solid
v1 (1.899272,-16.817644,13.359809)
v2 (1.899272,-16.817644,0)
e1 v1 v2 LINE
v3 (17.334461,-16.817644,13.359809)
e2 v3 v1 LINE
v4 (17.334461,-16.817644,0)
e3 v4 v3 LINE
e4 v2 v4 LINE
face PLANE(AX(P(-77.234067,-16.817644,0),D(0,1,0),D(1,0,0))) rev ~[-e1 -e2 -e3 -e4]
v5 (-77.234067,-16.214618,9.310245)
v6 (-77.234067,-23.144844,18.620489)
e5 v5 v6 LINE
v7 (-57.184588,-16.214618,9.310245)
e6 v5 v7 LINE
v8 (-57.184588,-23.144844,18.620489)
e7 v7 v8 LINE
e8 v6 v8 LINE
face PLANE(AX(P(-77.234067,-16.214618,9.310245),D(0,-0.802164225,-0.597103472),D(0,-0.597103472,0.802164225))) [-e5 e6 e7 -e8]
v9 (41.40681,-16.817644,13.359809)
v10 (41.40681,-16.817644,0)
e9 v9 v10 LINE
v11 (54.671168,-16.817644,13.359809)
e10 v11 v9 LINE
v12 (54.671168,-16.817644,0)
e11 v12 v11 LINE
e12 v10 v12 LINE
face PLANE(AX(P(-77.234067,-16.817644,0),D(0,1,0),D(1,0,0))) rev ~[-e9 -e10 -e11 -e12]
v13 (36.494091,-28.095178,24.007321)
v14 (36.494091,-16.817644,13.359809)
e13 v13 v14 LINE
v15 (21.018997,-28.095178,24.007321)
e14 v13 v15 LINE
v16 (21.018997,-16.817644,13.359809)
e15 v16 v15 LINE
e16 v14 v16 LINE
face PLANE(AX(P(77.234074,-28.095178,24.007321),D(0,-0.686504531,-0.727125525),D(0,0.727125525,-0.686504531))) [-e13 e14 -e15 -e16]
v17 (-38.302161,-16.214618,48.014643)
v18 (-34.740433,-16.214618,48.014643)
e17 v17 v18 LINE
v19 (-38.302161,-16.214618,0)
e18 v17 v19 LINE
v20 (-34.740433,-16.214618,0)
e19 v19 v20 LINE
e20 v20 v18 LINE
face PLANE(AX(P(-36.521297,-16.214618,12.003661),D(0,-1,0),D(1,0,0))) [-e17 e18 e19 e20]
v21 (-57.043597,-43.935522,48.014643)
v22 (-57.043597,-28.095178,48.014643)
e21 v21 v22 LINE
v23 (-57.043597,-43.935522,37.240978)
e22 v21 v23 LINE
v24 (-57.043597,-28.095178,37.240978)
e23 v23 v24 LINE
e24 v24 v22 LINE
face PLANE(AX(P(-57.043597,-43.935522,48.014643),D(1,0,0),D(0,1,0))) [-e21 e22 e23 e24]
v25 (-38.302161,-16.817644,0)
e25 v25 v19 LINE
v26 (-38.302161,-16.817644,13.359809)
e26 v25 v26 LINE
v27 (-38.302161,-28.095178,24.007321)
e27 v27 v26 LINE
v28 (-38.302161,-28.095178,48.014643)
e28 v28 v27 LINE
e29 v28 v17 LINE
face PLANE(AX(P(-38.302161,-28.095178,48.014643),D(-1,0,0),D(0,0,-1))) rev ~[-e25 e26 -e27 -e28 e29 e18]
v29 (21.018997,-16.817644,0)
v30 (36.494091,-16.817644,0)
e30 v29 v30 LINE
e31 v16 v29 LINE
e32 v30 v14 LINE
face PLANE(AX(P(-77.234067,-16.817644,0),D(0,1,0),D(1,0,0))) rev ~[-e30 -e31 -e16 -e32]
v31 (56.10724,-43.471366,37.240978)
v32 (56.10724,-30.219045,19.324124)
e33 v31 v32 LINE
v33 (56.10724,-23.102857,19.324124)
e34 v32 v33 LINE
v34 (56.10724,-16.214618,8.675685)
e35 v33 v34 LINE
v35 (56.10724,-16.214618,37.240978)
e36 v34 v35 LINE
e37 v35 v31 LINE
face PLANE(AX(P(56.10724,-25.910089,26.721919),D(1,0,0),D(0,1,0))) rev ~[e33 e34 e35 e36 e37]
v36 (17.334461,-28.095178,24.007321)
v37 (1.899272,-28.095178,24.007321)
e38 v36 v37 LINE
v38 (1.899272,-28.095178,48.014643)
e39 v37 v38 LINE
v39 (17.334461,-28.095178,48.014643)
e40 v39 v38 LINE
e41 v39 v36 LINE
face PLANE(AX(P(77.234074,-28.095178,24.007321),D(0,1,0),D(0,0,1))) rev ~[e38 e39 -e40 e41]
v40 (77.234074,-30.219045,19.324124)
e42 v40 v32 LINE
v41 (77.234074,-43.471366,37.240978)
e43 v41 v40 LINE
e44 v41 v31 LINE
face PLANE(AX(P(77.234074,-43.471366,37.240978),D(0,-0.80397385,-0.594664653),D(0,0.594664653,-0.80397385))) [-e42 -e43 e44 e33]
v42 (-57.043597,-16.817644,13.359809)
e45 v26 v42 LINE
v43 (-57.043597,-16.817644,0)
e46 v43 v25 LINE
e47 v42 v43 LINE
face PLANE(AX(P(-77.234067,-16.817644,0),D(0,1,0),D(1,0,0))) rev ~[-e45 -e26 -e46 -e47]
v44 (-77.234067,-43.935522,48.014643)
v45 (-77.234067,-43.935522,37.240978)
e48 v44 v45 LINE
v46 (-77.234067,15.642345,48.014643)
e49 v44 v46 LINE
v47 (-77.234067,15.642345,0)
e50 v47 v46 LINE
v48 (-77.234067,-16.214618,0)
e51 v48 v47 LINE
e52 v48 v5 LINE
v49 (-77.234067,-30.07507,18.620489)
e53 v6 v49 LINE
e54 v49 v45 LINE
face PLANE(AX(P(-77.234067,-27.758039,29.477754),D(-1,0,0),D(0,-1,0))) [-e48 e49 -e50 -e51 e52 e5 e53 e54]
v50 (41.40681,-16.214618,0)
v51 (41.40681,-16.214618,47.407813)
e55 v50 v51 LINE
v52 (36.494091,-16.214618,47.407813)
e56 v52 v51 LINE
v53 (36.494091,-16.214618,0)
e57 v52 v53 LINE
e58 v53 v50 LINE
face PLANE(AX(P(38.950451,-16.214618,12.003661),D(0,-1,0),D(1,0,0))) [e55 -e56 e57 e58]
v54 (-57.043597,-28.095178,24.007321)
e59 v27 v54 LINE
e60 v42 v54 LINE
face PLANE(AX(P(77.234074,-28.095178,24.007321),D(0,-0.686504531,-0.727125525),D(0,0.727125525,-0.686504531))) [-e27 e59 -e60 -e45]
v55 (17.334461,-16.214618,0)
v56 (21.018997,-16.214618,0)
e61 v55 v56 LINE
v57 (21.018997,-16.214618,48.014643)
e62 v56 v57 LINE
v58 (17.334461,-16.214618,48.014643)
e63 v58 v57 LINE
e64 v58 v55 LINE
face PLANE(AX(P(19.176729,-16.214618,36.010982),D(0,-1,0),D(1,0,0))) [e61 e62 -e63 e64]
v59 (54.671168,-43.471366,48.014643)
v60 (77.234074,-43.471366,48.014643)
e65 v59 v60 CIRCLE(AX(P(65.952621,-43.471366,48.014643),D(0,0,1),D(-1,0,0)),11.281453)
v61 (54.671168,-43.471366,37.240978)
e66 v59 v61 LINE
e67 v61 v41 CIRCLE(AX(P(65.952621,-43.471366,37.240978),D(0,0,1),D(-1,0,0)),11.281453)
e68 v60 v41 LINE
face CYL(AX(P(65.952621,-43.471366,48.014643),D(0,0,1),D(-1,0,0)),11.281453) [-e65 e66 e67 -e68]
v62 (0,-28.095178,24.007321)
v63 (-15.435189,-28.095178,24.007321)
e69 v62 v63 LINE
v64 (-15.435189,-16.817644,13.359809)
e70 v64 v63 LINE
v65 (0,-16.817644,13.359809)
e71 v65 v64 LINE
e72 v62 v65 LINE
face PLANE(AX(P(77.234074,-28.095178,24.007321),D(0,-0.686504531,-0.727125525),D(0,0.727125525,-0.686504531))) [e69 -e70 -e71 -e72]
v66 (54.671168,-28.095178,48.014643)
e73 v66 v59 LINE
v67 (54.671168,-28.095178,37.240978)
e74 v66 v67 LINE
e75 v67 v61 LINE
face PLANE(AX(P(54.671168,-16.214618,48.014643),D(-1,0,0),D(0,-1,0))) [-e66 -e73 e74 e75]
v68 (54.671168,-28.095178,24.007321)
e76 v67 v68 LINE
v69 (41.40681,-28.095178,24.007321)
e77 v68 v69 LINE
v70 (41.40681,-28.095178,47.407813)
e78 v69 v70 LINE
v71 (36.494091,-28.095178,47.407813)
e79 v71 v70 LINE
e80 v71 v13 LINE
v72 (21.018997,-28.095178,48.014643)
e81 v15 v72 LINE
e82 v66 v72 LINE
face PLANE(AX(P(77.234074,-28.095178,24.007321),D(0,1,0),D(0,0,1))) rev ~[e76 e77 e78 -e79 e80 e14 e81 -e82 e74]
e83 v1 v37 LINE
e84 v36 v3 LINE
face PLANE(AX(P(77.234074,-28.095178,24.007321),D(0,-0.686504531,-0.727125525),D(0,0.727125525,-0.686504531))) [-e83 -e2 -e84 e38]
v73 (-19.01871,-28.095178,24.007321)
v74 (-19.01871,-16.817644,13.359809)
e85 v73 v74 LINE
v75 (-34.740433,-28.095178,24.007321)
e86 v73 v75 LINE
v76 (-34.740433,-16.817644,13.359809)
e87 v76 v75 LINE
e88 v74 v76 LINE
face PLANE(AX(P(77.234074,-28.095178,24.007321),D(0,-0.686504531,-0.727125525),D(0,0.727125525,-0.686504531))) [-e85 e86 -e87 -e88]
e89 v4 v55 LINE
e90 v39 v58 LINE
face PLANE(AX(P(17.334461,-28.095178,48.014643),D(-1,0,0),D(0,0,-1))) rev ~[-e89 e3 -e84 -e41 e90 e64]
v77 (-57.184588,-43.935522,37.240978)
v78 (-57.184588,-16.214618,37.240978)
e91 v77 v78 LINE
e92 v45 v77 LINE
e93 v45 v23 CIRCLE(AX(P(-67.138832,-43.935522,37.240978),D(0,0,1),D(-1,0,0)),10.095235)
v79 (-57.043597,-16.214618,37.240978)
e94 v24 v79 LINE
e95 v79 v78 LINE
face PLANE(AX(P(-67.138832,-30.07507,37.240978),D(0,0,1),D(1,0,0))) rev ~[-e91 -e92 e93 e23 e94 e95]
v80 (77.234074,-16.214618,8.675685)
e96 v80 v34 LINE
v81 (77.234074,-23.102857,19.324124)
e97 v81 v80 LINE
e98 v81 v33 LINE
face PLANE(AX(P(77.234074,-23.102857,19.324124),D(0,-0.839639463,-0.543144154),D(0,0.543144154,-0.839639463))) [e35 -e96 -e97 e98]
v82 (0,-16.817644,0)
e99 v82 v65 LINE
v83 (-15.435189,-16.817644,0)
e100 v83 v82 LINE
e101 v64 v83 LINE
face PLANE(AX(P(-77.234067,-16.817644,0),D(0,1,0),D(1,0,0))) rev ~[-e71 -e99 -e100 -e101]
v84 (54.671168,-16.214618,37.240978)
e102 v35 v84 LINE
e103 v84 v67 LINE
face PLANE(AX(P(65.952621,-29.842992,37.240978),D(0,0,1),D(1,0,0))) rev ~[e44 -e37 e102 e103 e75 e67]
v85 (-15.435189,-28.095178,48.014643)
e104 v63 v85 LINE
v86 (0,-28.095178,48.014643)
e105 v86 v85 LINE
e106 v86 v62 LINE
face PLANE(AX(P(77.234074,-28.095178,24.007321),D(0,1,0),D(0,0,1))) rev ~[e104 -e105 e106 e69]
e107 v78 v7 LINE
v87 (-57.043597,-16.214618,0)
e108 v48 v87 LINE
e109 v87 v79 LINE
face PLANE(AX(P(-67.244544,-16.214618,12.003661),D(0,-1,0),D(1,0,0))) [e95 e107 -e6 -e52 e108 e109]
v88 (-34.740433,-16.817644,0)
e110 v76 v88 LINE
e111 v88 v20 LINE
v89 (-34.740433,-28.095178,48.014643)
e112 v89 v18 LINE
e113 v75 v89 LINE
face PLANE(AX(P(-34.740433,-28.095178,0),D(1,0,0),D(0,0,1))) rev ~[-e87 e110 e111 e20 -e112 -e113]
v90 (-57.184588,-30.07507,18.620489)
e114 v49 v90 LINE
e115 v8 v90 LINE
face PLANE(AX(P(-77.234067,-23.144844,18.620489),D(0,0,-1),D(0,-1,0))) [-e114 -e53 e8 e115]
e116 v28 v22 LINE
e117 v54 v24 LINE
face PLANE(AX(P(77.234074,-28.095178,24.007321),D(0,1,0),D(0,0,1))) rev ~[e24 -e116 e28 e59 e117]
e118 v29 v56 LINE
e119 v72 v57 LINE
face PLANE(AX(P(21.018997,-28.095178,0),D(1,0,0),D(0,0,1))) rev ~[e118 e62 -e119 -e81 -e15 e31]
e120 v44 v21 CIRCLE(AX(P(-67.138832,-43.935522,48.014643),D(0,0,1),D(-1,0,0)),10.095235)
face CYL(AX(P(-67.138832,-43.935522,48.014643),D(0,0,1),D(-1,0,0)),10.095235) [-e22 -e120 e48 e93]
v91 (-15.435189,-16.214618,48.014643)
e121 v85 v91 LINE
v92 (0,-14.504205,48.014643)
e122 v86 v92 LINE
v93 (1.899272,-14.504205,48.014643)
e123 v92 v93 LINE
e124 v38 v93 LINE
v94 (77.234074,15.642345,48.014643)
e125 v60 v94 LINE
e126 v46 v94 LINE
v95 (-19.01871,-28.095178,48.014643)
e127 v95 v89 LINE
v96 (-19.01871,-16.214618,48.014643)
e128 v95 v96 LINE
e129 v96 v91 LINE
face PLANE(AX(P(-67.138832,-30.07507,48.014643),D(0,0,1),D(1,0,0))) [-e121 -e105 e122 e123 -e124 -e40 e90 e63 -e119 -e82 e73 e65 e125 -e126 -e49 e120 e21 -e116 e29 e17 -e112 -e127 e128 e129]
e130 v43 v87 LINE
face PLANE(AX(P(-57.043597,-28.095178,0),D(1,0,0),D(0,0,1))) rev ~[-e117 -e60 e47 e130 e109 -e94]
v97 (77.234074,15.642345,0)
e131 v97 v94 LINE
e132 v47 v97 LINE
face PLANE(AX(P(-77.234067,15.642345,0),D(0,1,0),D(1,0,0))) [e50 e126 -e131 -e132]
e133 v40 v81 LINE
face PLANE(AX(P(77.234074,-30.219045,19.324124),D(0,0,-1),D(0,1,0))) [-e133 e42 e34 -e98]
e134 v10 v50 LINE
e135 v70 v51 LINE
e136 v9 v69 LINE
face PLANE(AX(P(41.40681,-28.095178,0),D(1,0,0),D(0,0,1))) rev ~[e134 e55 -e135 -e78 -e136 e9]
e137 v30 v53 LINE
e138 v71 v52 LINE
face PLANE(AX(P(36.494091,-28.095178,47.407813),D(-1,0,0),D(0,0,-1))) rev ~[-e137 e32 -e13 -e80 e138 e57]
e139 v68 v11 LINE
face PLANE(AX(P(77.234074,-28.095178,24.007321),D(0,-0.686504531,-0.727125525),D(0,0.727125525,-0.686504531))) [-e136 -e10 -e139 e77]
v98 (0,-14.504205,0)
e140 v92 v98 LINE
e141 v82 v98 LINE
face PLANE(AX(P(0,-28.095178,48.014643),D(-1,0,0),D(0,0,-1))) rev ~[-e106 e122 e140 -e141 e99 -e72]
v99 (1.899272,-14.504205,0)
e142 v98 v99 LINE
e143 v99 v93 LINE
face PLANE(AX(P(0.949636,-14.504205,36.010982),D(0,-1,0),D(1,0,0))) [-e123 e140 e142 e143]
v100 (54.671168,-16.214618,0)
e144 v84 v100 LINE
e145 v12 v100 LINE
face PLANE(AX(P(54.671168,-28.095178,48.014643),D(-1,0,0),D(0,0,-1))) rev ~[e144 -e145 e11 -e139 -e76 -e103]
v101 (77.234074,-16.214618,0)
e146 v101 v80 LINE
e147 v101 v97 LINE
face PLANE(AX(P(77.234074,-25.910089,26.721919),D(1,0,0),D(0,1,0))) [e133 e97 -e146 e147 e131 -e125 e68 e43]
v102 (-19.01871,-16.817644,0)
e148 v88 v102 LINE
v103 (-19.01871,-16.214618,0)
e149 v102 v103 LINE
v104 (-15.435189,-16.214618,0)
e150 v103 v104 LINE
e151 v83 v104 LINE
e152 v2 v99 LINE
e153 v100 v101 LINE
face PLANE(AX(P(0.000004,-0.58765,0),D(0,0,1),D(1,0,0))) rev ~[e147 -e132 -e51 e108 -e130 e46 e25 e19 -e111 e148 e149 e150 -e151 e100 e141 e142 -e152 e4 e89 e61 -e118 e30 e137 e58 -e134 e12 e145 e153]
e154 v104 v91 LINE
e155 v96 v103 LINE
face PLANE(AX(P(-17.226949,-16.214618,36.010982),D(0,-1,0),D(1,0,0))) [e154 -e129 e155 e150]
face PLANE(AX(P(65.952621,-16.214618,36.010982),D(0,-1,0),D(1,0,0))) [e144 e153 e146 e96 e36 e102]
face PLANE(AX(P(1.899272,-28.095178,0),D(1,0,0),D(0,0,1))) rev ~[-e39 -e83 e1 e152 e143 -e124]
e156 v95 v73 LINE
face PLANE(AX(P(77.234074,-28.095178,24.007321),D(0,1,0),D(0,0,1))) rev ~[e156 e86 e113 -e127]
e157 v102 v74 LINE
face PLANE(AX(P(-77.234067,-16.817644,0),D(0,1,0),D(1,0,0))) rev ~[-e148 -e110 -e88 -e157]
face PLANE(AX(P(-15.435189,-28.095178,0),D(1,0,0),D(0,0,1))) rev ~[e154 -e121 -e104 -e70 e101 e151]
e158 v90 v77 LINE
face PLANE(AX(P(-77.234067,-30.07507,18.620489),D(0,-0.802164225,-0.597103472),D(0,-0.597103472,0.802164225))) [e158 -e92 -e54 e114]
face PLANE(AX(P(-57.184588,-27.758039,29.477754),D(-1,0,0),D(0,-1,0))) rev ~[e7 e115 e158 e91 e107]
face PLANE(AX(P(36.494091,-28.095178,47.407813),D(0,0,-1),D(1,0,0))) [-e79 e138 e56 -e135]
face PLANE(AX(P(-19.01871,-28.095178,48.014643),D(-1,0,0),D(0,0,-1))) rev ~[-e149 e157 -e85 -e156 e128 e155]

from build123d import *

# Parameters (mm, degrees)
F0_W      = 154.4681414962
F0_H      = 32.4599891901
F1_DEPTH  = 48.0146426708
F2_W      = 11.2775340676
F2_H      = 24.0073213354
F3_DEPTH  = 154.6795647591
F4_W      = 20.4018931836
F4_H      = 24.0073213354
F4_W_2    = 3.5617277026
F4_W_3    = 3.5835206509
F4_W_4    = 3.6845356226
F4_W_5    = 4.9127191305
F4_W_6    = 22.562906146
F4_H_2    = 23.4004920349
F5_DEPTH  = 11.8805598468
F7_DEPTH  = 10.7736643404
F9_DEPTH  = 20.0494788587
F11_DEPTH = 21.1268346757
F12_W     = 1.8992722034
F12_H     = 24.0073213354
F13_DEPTH = 13.5909728706


with BuildPart() as f1:
    # F0 (on Top) → F1 (new body)
    with BuildSketch(Plane.XY):
        with Locations((3.7253e-06, -0.5876496434)):
            Rectangle(F0_W, F0_H)
    extrude(amount=F1_DEPTH)

    # F2 (on face) → F3 (join)
    with BuildSketch(Plane.YZ.offset(77.2340744734)):
        with Locations((-22.4564112723, 36.0109820031)):
            Rectangle(F2_W, F2_H)
        Polygon((-16.8176442385, 13.3598086642), (-16.8176442385, 24.0073213354), (-28.0951783061, 24.0073213354), align=None)
    extrude(amount=-F3_DEPTH)

    # F4 (on face) → F5 (cut)
    with BuildSketch(Plane.XZ.offset(28.0951783061)):
        with Locations((-67.244543694, 12.0036606677)):
            Rectangle(F4_W, F4_H)
        with Locations((-67.244543694, 36.0109820031)):
            Rectangle(F4_W, F4_H)
        with Locations((-36.5212969482, 12.0036606677)):
            Rectangle(F4_W_2, F4_H)
        with Locations((-36.5212969482, 36.0109820031)):
            Rectangle(F4_W_2, F4_H)
        with Locations((-17.2269493341, 36.0109820031)):
            Rectangle(F4_W_3, F4_H)
        with Locations((-17.2269493341, 12.0036606677)):
            Rectangle(F4_W_3, F4_H)
        with Locations((19.1767290235, 36.0109820031)):
            Rectangle(F4_W_4, F4_H)
        with Locations((19.1767290235, 12.0036606677)):
            Rectangle(F4_W_4, F4_H)
        with Locations((38.9504507184, 12.0036606677)):
            Rectangle(F4_W_5, F4_H)
        with Locations((65.9526214004, 36.0109820031)):
            Rectangle(F4_W_6, F4_H)
        with Locations((65.9526214004, 12.0036606677)):
            Rectangle(F4_W_6, F4_H)
        with Locations((38.9504507184, 35.7075673528)):
            Rectangle(F4_W_5, F4_H_2)
    extrude(amount=-F5_DEPTH, mode=Mode.SUBTRACT)

    # F6 (on face) → F7 (join)
    with BuildSketch(Plane.XY.offset(48.0146426708)):
        Polygon((-57.0435971022, -16.2146184593), (-77.2340670228, -16.2146184593), (-77.2340670228, -43.9355224371), (-57.0435971022, -43.9355224371), (-57.0435971022, -28.0951783061), align=None)
        with BuildLine():
            Line((-57.0435971022, -43.9355224371), (-77.2340670228, -43.9355224371))
            ThreePointArc((-77.2340670228, -43.9355224371), (-67.1388320625, -54.0307573974), (-57.0435971022, -43.9355224371))
        make_face()
        Polygon((77.2340744734, -43.4713661671), (77.2340744734, -16.2146184593), (54.6711683273, -16.2146184593), (54.6711683273, -28.0951783061), (54.6711683273, -43.4713661671), align=None)
        with BuildLine():
            ThreePointArc((54.6711683273, -43.4713661671), (65.9526214004, -54.7528192401), (77.2340744734, -43.4713661671))
            Line((77.2340744734, -43.4713661671), (54.6711683273, -43.4713661671))
        make_face()
    extrude(amount=-F7_DEPTH)

    # F8 (on face) → F9 (join)
    with BuildSketch(Plane(origin=(-77.2340670228, 0, 0), x_dir=(0, -1, 0), z_dir=(-1, 0, 0))):
        Polygon((30.0750704482, 18.6204891652), (43.9355224371, 37.2409783304), (16.2146184593, 37.2409783304), (16.2146184593, 18.6204891652), (23.1448444538, 18.6204891652), align=None)
        Polygon((16.2146184593, 9.3102445826), (23.1448444538, 18.6204891652), (16.2146184593, 18.6204891652), align=None)
    extrude(amount=-F9_DEPTH)

    # F10 (on face) → F11 (join)
    with BuildSketch(Plane.YZ.offset(77.2340744734)):
        Polygon((-16.2146184593, 37.2409783304), (-43.4713661671, 37.2409783304), (-30.2190445364, 19.3241238594), (-23.1028571725, 19.3241238594), (-16.2146184593, 8.6756854873), align=None)
    extrude(amount=-F11_DEPTH)

    # F12 (on face) → F13 (cut)
    with BuildSketch(Plane.XZ.offset(28.0951783061)):
        with Locations((0.9496361017, 36.0109820031)):
            Rectangle(F12_W, F12_H)
        with Locations((0.9496361017, 12.0036606677)):
            Rectangle(F12_W, F12_H)
    extrude(amount=-F13_DEPTH, mode=Mode.SUBTRACT)


solid = f1.part
